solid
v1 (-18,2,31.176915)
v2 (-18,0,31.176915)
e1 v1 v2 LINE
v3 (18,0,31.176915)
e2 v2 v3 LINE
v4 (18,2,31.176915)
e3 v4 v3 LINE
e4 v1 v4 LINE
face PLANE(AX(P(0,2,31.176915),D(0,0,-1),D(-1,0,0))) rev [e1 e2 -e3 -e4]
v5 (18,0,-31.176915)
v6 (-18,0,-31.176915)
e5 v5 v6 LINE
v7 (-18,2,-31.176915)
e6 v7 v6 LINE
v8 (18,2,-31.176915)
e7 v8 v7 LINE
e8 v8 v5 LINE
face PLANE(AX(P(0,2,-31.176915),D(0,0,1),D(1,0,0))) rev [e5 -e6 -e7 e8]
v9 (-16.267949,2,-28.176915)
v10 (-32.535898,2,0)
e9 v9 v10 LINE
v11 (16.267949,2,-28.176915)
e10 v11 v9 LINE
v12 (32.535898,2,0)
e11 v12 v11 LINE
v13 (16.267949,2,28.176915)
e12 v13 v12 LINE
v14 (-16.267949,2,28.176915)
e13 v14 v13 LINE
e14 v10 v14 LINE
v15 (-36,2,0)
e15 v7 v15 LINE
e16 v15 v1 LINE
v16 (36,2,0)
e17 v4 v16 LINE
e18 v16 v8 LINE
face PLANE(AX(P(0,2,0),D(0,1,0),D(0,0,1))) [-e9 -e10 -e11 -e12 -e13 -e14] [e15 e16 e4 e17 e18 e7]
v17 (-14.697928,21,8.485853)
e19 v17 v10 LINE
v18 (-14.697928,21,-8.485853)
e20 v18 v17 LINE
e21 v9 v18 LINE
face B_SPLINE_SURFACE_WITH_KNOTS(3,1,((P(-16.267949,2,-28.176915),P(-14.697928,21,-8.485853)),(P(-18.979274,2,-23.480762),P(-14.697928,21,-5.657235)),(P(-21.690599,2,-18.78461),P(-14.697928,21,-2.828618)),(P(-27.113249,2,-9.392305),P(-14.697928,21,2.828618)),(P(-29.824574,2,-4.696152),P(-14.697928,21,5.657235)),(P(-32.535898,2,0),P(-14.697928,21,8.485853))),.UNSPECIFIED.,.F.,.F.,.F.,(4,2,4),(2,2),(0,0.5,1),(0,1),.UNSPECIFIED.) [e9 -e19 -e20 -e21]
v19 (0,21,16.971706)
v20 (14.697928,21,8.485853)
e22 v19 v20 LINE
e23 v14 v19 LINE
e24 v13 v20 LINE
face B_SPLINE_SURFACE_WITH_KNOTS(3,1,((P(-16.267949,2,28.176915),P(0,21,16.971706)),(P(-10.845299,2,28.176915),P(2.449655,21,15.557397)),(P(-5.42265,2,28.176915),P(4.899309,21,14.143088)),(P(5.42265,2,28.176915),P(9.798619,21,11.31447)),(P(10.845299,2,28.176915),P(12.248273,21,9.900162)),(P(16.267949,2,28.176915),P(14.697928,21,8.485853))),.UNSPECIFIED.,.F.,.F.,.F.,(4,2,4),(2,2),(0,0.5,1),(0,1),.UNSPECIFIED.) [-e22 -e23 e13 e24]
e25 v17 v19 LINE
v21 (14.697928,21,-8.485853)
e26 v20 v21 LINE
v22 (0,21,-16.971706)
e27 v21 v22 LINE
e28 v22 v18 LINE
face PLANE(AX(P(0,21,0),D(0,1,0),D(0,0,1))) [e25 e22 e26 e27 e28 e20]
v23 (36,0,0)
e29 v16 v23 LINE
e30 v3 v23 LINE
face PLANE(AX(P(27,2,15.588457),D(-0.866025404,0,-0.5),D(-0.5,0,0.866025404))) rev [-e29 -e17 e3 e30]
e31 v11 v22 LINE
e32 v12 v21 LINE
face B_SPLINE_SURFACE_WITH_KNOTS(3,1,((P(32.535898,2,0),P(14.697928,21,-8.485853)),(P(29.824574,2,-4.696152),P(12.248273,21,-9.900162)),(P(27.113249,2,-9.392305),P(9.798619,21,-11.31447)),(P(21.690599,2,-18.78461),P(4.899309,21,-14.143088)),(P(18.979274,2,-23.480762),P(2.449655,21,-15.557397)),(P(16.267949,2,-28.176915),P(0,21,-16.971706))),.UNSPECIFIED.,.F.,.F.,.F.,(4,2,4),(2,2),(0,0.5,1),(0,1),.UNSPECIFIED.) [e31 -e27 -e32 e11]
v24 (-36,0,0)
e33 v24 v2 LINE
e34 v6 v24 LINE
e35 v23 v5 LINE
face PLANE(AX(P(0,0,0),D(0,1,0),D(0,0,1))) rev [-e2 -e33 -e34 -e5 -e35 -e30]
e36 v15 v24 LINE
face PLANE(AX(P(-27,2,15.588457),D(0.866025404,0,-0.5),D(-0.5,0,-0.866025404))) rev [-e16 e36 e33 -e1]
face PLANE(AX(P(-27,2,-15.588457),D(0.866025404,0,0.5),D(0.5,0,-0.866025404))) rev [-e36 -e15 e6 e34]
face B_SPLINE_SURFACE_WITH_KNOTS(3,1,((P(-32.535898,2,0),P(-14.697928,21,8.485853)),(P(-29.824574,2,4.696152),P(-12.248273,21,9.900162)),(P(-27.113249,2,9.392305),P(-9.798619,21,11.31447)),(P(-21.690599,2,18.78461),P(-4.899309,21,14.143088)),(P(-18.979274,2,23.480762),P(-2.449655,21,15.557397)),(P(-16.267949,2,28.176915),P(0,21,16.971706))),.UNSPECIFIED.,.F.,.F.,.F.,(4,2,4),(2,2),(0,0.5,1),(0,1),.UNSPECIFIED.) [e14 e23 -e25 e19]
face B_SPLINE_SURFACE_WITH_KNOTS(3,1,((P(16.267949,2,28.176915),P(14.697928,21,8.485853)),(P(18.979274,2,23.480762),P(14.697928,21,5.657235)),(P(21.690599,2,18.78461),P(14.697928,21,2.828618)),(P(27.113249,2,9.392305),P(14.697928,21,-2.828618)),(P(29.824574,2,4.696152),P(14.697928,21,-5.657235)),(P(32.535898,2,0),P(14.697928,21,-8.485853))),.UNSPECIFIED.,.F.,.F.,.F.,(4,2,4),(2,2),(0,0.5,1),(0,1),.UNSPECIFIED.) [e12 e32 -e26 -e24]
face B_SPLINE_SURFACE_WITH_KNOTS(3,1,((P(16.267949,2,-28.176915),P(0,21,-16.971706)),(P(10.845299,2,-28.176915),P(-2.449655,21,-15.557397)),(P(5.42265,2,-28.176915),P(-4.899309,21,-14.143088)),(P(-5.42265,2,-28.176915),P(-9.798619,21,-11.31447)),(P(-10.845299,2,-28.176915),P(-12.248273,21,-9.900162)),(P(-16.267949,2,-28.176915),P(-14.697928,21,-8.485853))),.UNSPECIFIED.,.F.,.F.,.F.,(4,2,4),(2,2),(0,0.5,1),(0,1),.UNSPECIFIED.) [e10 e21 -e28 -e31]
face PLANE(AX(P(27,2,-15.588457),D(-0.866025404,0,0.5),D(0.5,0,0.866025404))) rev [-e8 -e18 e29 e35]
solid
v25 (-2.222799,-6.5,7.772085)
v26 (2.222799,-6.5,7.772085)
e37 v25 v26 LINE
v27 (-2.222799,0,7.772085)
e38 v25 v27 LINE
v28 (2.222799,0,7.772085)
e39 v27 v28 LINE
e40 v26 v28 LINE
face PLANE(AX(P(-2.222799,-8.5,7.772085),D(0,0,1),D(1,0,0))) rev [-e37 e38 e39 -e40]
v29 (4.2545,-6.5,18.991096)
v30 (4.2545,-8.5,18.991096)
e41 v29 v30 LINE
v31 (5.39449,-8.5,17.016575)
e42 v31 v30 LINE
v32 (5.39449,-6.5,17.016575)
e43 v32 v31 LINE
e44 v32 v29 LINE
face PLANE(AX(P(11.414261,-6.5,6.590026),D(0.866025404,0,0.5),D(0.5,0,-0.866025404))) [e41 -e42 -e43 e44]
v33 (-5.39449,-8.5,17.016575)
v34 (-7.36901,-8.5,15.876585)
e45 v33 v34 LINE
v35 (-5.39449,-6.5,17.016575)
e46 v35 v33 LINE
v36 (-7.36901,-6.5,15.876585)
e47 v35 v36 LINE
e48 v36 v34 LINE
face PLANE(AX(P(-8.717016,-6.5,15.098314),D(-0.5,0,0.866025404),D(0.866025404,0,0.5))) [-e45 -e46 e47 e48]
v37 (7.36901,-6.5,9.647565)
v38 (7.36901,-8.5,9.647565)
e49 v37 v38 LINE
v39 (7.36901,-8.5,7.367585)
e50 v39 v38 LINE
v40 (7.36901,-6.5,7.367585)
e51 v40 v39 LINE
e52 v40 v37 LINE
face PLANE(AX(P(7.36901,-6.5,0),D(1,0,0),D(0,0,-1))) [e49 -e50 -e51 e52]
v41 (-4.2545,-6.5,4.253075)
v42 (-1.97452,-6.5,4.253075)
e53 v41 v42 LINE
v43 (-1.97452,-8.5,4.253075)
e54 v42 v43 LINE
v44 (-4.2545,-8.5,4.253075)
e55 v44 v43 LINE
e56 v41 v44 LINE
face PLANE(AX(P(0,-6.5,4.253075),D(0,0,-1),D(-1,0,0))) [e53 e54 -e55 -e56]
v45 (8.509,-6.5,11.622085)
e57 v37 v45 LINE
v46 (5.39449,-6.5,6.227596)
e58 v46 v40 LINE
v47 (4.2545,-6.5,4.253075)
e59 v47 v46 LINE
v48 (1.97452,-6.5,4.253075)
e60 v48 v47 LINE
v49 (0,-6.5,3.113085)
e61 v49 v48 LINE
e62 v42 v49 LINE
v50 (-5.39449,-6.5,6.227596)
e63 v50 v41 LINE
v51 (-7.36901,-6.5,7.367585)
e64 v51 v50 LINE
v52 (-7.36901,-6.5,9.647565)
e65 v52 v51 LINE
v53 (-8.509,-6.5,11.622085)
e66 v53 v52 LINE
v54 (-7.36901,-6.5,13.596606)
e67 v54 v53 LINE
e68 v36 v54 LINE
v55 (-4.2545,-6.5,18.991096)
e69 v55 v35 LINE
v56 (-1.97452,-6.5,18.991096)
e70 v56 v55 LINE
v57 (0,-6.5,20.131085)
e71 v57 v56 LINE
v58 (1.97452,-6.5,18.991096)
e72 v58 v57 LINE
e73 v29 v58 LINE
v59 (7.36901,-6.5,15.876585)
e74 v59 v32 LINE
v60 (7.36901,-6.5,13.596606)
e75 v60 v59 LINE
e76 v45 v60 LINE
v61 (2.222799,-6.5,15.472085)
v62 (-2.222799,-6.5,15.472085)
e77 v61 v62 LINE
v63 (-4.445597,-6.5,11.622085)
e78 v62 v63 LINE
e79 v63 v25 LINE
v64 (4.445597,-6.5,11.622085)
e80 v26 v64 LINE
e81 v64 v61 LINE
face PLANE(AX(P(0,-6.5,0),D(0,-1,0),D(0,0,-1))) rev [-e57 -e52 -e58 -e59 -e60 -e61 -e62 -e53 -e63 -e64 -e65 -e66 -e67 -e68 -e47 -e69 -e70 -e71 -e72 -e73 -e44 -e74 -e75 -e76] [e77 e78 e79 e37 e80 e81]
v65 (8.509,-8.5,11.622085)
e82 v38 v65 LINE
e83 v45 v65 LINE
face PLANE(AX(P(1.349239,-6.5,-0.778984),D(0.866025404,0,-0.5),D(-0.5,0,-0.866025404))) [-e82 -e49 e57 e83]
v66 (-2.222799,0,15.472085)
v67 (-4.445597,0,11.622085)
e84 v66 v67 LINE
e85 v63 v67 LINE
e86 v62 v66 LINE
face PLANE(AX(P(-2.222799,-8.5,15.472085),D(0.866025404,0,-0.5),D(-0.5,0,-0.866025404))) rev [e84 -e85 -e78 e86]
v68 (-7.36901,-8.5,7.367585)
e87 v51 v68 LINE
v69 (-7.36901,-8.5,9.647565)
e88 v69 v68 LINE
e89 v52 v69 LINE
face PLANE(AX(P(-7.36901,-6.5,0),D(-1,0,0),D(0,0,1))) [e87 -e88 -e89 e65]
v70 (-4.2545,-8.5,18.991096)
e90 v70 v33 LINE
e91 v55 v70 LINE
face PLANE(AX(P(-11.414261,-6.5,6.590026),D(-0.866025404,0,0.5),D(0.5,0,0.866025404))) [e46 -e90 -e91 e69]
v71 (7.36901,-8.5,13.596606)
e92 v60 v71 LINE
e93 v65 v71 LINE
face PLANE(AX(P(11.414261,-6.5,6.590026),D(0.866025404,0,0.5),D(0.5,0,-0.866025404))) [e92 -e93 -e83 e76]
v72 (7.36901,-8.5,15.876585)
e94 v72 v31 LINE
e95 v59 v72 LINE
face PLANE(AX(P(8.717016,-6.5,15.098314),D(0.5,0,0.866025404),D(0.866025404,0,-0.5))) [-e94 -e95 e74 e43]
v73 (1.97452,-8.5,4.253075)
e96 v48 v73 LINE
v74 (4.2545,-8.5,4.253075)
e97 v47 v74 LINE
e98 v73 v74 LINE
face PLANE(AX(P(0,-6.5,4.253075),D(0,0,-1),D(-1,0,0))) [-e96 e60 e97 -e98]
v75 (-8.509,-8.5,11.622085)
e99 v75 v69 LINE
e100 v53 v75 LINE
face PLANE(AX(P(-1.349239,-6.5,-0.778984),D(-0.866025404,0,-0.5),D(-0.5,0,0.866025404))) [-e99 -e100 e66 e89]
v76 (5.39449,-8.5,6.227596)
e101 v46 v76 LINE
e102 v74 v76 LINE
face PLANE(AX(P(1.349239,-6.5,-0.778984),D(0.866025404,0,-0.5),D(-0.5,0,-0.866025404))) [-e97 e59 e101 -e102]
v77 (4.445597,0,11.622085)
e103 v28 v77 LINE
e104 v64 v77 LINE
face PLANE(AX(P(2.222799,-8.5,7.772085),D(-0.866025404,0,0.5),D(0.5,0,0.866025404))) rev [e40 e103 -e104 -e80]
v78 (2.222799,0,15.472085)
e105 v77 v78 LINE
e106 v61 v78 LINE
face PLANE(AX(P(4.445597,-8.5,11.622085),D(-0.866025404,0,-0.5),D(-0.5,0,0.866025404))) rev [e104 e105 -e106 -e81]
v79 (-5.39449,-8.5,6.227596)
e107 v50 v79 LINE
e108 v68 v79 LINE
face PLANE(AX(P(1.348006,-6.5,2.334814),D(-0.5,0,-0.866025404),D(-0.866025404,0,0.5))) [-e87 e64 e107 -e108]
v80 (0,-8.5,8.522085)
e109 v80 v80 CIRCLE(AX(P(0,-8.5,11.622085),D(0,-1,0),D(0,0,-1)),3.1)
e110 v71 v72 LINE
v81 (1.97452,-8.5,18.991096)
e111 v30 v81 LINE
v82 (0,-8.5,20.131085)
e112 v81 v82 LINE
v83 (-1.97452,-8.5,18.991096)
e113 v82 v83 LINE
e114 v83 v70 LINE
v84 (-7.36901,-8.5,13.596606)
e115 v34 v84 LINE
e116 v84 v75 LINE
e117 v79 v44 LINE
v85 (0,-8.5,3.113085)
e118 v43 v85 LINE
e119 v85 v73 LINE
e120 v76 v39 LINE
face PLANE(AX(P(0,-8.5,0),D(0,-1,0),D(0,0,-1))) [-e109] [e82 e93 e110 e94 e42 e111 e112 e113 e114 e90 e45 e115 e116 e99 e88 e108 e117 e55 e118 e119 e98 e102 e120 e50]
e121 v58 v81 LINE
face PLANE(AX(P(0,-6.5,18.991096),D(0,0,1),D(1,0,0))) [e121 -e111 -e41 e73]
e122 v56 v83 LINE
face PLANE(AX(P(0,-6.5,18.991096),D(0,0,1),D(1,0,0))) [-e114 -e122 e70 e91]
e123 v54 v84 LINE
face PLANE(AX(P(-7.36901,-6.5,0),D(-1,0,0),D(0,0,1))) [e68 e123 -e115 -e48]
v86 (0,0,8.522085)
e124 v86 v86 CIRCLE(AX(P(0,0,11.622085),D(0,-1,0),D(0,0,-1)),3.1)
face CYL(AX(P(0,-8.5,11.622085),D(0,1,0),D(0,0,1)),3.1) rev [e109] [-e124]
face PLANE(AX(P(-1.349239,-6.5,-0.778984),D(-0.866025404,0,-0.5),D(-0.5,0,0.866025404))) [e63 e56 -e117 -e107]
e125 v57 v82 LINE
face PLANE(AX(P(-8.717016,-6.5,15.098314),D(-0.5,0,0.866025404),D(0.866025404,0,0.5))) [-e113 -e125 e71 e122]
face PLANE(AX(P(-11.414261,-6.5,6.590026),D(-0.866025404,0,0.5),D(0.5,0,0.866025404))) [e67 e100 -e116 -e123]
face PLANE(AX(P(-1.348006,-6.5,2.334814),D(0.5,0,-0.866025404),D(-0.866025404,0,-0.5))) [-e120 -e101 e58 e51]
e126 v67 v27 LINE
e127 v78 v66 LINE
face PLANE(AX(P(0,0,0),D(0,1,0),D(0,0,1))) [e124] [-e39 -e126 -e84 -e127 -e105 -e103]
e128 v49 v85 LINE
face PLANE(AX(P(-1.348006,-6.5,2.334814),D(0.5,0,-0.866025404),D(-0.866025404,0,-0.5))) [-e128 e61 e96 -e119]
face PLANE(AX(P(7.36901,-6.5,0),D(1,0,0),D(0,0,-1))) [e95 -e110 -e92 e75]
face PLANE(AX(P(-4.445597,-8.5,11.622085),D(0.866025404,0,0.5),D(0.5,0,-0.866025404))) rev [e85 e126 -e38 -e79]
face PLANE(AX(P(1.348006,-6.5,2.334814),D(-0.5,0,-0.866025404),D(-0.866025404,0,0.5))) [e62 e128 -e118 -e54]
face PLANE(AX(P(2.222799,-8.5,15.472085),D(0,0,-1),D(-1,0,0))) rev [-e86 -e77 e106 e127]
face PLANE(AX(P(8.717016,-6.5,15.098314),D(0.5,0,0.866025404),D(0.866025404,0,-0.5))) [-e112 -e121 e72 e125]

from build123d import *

# Parameters (mm, degrees)
SKETCH3_R           = 3.1
BOSS_EXTRUDE1_DEPTH = 8.5
SKETCH6_R           = 36
CUT_EXTRUDE1_DEPTH  = 20.99999991
BOSS_EXTRUDE2_START = -2
SKETCH5_R           = 3.1
BOSS_EXTRUDE2_DEPTH = 2
SKETCH7_R           = 3.1
BOSS_EXTRUDE3_DEPTH = 2


with BuildPart() as part:
    # Loft1: read off the stored shape, not the designer's step
    # Loft1: loft between two sections, ruled curve by curve
    loft1_from = [
        Edge.make_bspline([(-18, 0, 31.176914536), (-12, 0, 31.176914536), (-6, 0, 31.176914536), (6, 0, 31.176914536), (12, 0, 31.176914536), (18, 0, 31.176914536)], [0, 0, 0, 0, 0.5, 0.5, 1, 1, 1, 1], 3),
        Edge.make_bspline([(18, 0, 31.176914536), (21, 0, 25.980762114), (24, 0, 20.784609691), (30, 0, 10.392304845), (33, 0, 5.196152423), (36, 0, 0)], [0, 0, 0, 0, 0.5, 0.5, 1, 1, 1, 1], 3),
        Edge.make_bspline([(-36, 0, 0), (-33, 0, 5.196152423), (-30, 0, 10.392304845), (-24, 0, 20.784609691), (-21, 0, 25.980762114), (-18, 0, 31.176914536)], [0, 0, 0, 0, 0.5, 0.5, 1, 1, 1, 1], 3),
        Edge.make_bspline([(36, 0, 0), (33, 0, -5.196152423), (30, 0, -10.392304845), (24, 0, -20.784609691), (21, 0, -25.980762114), (18, 0, -31.176914536)], [0, 0, 0, 0, 0.5, 0.5, 1, 1, 1, 1], 3),
        Edge.make_bspline([(18, 0, -31.176914536), (12, 0, -31.176914536), (6, 0, -31.176914536), (-6, 0, -31.176914536), (-12, 0, -31.176914536), (-18, 0, -31.176914536)], [0, 0, 0, 0, 0.5, 0.5, 1, 1, 1, 1], 3),
        Edge.make_bspline([(-18, 0, -31.176914536), (-21, 0, -25.980762114), (-24, 0, -20.784609691), (-30, 0, -10.392304845), (-33, 0, -5.196152423), (-36, 0, 0)], [0, 0, 0, 0, 0.5, 0.5, 1, 1, 1, 1], 3),
    ]
    loft1_to = [
        Edge.make_bspline([(0, 20.99999991, 18.6), (2.684678752, 20.99999991, 17.05), (5.369357503, 20.99999991, 15.5), (10.738715007, 20.99999991, 12.4), (13.423393759, 20.99999991, 10.85), (16.10807251, 20.99999991, 9.3)], [0, 0, 0, 0, 0.5, 0.5, 1, 1, 1, 1], 3),
        Edge.make_bspline([(16.10807251, 20.99999991, 9.3), (16.10807251, 20.99999991, 6.2), (16.10807251, 20.99999991, 3.1), (16.10807251, 20.99999991, -3.1), (16.10807251, 20.99999991, -6.2), (16.10807251, 20.99999991, -9.3)], [0, 0, 0, 0, 0.5, 0.5, 1, 1, 1, 1], 3),
        Edge.make_bspline([(-16.10807251, 20.99999991, 9.3), (-13.423393759, 20.99999991, 10.85), (-10.738715007, 20.99999991, 12.4), (-5.369357503, 20.99999991, 15.5), (-2.684678752, 20.99999991, 17.05), (0, 20.99999991, 18.6)], [0, 0, 0, 0, 0.5, 0.5, 1, 1, 1, 1], 3),
        Edge.make_bspline([(16.10807251, 20.99999991, -9.3), (13.423393759, 20.99999991, -10.85), (10.738715007, 20.99999991, -12.4), (5.369357503, 20.99999991, -15.5), (2.684678752, 20.99999991, -17.05), (0, 20.99999991, -18.6)], [0, 0, 0, 0, 0.5, 0.5, 1, 1, 1, 1], 3),
        Edge.make_bspline([(0, 20.99999991, -18.6), (-2.684678752, 20.99999991, -17.05), (-5.369357503, 20.99999991, -15.5), (-10.738715007, 20.99999991, -12.4), (-13.423393759, 20.99999991, -10.85), (-16.10807251, 20.99999991, -9.3)], [0, 0, 0, 0, 0.5, 0.5, 1, 1, 1, 1], 3),
        Edge.make_bspline([(-16.10807251, 20.99999991, -9.3), (-16.10807251, 20.99999991, -6.2), (-16.10807251, 20.99999991, -3.1), (-16.10807251, 20.99999991, 3.1), (-16.10807251, 20.99999991, 6.2), (-16.10807251, 20.99999991, 9.3)], [0, 0, 0, 0, 0.5, 0.5, 1, 1, 1, 1], 3),
    ]
    loft1 = Solid(Shell([*[Face.make_surface_from_curves(loft1_from[k], loft1_to[k]) for k in range(6)], Face(Wire(loft1_from)), Face(Wire(loft1_to))]))
    add(loft1)

    # Sketch3 → Boss-Extrude1 (add)
    with BuildSketch(Plane.XZ):
        Polygon((4.445597073, 11.622085464), (2.222798536, 15.472085464), (-2.222798536, 15.472085464), (-4.445597073, 11.622085464), (-2.222798536, 7.772085464), (2.222798536, 7.772085464), align=None)
        with Locations(Location((0, 11.622085464, 0), (0, 0, 270))):
            Circle(SKETCH3_R, mode=Mode.SUBTRACT)
    extrude(amount=BOSS_EXTRUDE1_DEPTH)

    # Sketch6 → Cut-Extrude1 (cut)
    with BuildSketch(Plane(origin=(0, 20.99999991, 0), x_dir=(1, 0, 0), z_dir=(0, 1, 0))):
        Circle(SKETCH6_R)
    extrude(amount=-CUT_EXTRUDE1_DEPTH, mode=Mode.SUBTRACT)

    # Sketch5 → Boss-Extrude2 (add)
    with BuildSketch(Plane.XZ.offset(8.5).offset(BOSS_EXTRUDE2_START)):
        Polygon((-8.509, 11.622085464), (-7.369010161, 9.647565142), (-7.369010161, 7.367585464), (-5.394489839, 6.227595625), (-4.2545, 4.253075303), (-1.974520322, 4.253075303), (0, 3.113085464), (1.974520322, 4.253075303), (4.2545, 4.253075303), (5.394489839, 6.227595625), (7.369010161, 7.367585464), (7.369010161, 9.647565142), (8.509, 11.622085464), (7.369010161, 13.596605785), (7.369010161, 15.876585464), (5.394489839, 17.016575303), (4.2545, 18.991095625), (1.974520322, 18.991095625), (0, 20.131085464), (-1.974520322, 18.991095625), (-4.2545, 18.991095625), (-5.394489839, 17.016575303), (-7.369010161, 15.876585464), (-7.369010161, 13.596605785), align=None)
        with Locations(Location((0, 11.622085464, 0), (0, 0, 270))):
            Circle(SKETCH5_R, mode=Mode.SUBTRACT)
    extrude(amount=BOSS_EXTRUDE2_DEPTH)


with BuildPart() as body_2:
    # Sketch7 → Boss-Extrude3 (new body)
    # profile 1 of 4: a face of its own
    with BuildSketch(Plane(origin=(0, 0, 0), x_dir=(1, 0, 0), z_dir=(0, 1, 0))):
        Polygon((18, 31.176914536), (-18, 31.176914536), (-36, 0), (-18, -31.176914536), (18, -31.176914536), (36, 0), align=None)
        Polygon((4.445597073, -11.622085464), (2.222798536, -7.772085464), (-2.222798536, -7.772085464), (-4.445597073, -11.622085464), (-2.222798536, -15.472085464), (2.222798536, -15.472085464), align=None, mode=Mode.SUBTRACT)
    # profile 2 of 4: a face of its own
    with BuildSketch(Plane(origin=(0, 0, 0), x_dir=(1, 0, 0), z_dir=(0, 1, 0))):
        Polygon((2.222798536, -15.472085464), (4.445597073, -11.622085464), (2.222798536, -7.772085464), (-2.222798536, -7.772085464), (-4.445597073, -11.622085464), (-2.222798536, -15.472085464), align=None)
        with Locations(Location((0, -11.622085464, 0), (0, 0, 90))):
            Circle(SKETCH7_R, mode=Mode.SUBTRACT)
    # profile 3 of 4: a face of its own
    with BuildSketch(Plane(origin=(0, 0, 0), x_dir=(1, 0, 0), z_dir=(0, 1, 0))):
        with Locations(Location((0, -11.622085464, 0), (0, 0, 90))):
            Circle(SKETCH7_R)
    # profile 4 of 4: a face of its own
    with BuildSketch(Plane(origin=(0, 0, 0), x_dir=(1, 0, 0), z_dir=(0, 1, 0))):
        Polygon((4.445597073, -11.622085464), (2.222798536, -7.772085464), (-2.222798536, -7.772085464), (-4.445597073, -11.622085464), (-2.222798536, -15.472085464), (2.222798536, -15.472085464), align=None)
    extrude(amount=BOSS_EXTRUDE3_DEPTH)

    # Loft2: read off the stored shape, not the designer's step
    # Loft2: loft between two sections, ruled curve by curve
    loft2_from = [
        Edge.make_bspline([(-32.535898385, 2, 0), (-29.824573519, 2, 4.696152423), (-27.113248654, 2, 9.392304845), (-21.690598923, 2, 18.784609691), (-18.979274058, 2, 23.480762114), (-16.267949192, 2, 28.176914536)], [0, 0, 0, 0, 0.5, 0.5, 1, 1, 1, 1], 3),
        Edge.make_bspline([(-16.267949192, 2, 28.176914536), (-10.845299462, 2, 28.176914536), (-5.422649731, 2, 28.176914536), (5.422649731, 2, 28.176914536), (10.845299462, 2, 28.176914536), (16.267949192, 2, 28.176914536)], [0, 0, 0, 0, 0.5, 0.5, 1, 1, 1, 1], 3),
        Edge.make_bspline([(-16.267949192, 2, -28.176914536), (-18.979274058, 2, -23.480762114), (-21.690598923, 2, -18.784609691), (-27.113248654, 2, -9.392304845), (-29.824573519, 2, -4.696152423), (-32.535898385, 2, 0)], [0, 0, 0, 0, 0.5, 0.5, 1, 1, 1, 1], 3),
        Edge.make_bspline([(16.267949192, 2, 28.176914536), (18.979274058, 2, 23.480762114), (21.690598923, 2, 18.784609691), (27.113248654, 2, 9.392304845), (29.824573519, 2, 4.696152423), (32.535898385, 2, 0)], [0, 0, 0, 0, 0.5, 0.5, 1, 1, 1, 1], 3),
        Edge.make_bspline([(32.535898385, 2, 0), (29.824573519, 2, -4.696152423), (27.113248654, 2, -9.392304845), (21.690598923, 2, -18.784609691), (18.979274058, 2, -23.480762114), (16.267949192, 2, -28.176914536)], [0, 0, 0, 0, 0.5, 0.5, 1, 1, 1, 1], 3),
        Edge.make_bspline([(16.267949192, 2, -28.176914536), (10.845299462, 2, -28.176914536), (5.422649731, 2, -28.176914536), (-5.422649731, 2, -28.176914536), (-10.845299462, 2, -28.176914536), (-16.267949192, 2, -28.176914536)], [0, 0, 0, 0, 0.5, 0.5, 1, 1, 1, 1], 3),
    ]
    loft2_to = [
        Edge.make_bspline([(-14.697928126, 21.0000001, 8.48585276), (-12.248273438, 21.0000001, 9.900161554), (-9.798618751, 21.0000001, 11.314470347), (-4.899309375, 21.0000001, 14.143087934), (-2.449654688, 21.0000001, 15.557396727), (0, 21.0000001, 16.97170552)], [0, 0, 0, 0, 0.5, 0.5, 1, 1, 1, 1], 3),
        Edge.make_bspline([(0, 21.0000001, 16.97170552), (2.449654688, 21.0000001, 15.557396727), (4.899309375, 21.0000001, 14.143087934), (9.798618751, 21.0000001, 11.314470347), (12.248273438, 21.0000001, 9.900161554), (14.697928126, 21.0000001, 8.48585276)], [0, 0, 0, 0, 0.5, 0.5, 1, 1, 1, 1], 3),
        Edge.make_bspline([(-14.697928126, 21.0000001, -8.48585276), (-14.697928126, 21.0000001, -5.657235173), (-14.697928126, 21.0000001, -2.828617587), (-14.697928126, 21.0000001, 2.828617587), (-14.697928126, 21.0000001, 5.657235173), (-14.697928126, 21.0000001, 8.48585276)], [0, 0, 0, 0, 0.5, 0.5, 1, 1, 1, 1], 3),
        Edge.make_bspline([(14.697928126, 21.0000001, 8.48585276), (14.697928126, 21.0000001, 5.657235173), (14.697928126, 21.0000001, 2.828617587), (14.697928126, 21.0000001, -2.828617587), (14.697928126, 21.0000001, -5.657235173), (14.697928126, 21.0000001, -8.48585276)], [0, 0, 0, 0, 0.5, 0.5, 1, 1, 1, 1], 3),
        Edge.make_bspline([(14.697928126, 21.0000001, -8.48585276), (12.248273438, 21.0000001, -9.900161554), (9.798618751, 21.0000001, -11.314470347), (4.899309375, 21.0000001, -14.143087934), (2.449654688, 21.0000001, -15.557396727), (0, 21.0000001, -16.97170552)], [0, 0, 0, 0, 0.5, 0.5, 1, 1, 1, 1], 3),
        Edge.make_bspline([(0, 21.0000001, -16.97170552), (-2.449654688, 21.0000001, -15.557396727), (-4.899309375, 21.0000001, -14.143087934), (-9.798618751, 21.0000001, -11.314470347), (-12.248273438, 21.0000001, -9.900161554), (-14.697928126, 21.0000001, -8.48585276)], [0, 0, 0, 0, 0.5, 0.5, 1, 1, 1, 1], 3),
    ]
    loft2 = Solid(Shell([*[Face.make_surface_from_curves(loft2_from[k], loft2_to[k]) for k in range(6)], Face(Wire(loft2_from)), Face(Wire(loft2_to))]))
    add(loft2)


solid = Compound([part.part, body_2.part])
